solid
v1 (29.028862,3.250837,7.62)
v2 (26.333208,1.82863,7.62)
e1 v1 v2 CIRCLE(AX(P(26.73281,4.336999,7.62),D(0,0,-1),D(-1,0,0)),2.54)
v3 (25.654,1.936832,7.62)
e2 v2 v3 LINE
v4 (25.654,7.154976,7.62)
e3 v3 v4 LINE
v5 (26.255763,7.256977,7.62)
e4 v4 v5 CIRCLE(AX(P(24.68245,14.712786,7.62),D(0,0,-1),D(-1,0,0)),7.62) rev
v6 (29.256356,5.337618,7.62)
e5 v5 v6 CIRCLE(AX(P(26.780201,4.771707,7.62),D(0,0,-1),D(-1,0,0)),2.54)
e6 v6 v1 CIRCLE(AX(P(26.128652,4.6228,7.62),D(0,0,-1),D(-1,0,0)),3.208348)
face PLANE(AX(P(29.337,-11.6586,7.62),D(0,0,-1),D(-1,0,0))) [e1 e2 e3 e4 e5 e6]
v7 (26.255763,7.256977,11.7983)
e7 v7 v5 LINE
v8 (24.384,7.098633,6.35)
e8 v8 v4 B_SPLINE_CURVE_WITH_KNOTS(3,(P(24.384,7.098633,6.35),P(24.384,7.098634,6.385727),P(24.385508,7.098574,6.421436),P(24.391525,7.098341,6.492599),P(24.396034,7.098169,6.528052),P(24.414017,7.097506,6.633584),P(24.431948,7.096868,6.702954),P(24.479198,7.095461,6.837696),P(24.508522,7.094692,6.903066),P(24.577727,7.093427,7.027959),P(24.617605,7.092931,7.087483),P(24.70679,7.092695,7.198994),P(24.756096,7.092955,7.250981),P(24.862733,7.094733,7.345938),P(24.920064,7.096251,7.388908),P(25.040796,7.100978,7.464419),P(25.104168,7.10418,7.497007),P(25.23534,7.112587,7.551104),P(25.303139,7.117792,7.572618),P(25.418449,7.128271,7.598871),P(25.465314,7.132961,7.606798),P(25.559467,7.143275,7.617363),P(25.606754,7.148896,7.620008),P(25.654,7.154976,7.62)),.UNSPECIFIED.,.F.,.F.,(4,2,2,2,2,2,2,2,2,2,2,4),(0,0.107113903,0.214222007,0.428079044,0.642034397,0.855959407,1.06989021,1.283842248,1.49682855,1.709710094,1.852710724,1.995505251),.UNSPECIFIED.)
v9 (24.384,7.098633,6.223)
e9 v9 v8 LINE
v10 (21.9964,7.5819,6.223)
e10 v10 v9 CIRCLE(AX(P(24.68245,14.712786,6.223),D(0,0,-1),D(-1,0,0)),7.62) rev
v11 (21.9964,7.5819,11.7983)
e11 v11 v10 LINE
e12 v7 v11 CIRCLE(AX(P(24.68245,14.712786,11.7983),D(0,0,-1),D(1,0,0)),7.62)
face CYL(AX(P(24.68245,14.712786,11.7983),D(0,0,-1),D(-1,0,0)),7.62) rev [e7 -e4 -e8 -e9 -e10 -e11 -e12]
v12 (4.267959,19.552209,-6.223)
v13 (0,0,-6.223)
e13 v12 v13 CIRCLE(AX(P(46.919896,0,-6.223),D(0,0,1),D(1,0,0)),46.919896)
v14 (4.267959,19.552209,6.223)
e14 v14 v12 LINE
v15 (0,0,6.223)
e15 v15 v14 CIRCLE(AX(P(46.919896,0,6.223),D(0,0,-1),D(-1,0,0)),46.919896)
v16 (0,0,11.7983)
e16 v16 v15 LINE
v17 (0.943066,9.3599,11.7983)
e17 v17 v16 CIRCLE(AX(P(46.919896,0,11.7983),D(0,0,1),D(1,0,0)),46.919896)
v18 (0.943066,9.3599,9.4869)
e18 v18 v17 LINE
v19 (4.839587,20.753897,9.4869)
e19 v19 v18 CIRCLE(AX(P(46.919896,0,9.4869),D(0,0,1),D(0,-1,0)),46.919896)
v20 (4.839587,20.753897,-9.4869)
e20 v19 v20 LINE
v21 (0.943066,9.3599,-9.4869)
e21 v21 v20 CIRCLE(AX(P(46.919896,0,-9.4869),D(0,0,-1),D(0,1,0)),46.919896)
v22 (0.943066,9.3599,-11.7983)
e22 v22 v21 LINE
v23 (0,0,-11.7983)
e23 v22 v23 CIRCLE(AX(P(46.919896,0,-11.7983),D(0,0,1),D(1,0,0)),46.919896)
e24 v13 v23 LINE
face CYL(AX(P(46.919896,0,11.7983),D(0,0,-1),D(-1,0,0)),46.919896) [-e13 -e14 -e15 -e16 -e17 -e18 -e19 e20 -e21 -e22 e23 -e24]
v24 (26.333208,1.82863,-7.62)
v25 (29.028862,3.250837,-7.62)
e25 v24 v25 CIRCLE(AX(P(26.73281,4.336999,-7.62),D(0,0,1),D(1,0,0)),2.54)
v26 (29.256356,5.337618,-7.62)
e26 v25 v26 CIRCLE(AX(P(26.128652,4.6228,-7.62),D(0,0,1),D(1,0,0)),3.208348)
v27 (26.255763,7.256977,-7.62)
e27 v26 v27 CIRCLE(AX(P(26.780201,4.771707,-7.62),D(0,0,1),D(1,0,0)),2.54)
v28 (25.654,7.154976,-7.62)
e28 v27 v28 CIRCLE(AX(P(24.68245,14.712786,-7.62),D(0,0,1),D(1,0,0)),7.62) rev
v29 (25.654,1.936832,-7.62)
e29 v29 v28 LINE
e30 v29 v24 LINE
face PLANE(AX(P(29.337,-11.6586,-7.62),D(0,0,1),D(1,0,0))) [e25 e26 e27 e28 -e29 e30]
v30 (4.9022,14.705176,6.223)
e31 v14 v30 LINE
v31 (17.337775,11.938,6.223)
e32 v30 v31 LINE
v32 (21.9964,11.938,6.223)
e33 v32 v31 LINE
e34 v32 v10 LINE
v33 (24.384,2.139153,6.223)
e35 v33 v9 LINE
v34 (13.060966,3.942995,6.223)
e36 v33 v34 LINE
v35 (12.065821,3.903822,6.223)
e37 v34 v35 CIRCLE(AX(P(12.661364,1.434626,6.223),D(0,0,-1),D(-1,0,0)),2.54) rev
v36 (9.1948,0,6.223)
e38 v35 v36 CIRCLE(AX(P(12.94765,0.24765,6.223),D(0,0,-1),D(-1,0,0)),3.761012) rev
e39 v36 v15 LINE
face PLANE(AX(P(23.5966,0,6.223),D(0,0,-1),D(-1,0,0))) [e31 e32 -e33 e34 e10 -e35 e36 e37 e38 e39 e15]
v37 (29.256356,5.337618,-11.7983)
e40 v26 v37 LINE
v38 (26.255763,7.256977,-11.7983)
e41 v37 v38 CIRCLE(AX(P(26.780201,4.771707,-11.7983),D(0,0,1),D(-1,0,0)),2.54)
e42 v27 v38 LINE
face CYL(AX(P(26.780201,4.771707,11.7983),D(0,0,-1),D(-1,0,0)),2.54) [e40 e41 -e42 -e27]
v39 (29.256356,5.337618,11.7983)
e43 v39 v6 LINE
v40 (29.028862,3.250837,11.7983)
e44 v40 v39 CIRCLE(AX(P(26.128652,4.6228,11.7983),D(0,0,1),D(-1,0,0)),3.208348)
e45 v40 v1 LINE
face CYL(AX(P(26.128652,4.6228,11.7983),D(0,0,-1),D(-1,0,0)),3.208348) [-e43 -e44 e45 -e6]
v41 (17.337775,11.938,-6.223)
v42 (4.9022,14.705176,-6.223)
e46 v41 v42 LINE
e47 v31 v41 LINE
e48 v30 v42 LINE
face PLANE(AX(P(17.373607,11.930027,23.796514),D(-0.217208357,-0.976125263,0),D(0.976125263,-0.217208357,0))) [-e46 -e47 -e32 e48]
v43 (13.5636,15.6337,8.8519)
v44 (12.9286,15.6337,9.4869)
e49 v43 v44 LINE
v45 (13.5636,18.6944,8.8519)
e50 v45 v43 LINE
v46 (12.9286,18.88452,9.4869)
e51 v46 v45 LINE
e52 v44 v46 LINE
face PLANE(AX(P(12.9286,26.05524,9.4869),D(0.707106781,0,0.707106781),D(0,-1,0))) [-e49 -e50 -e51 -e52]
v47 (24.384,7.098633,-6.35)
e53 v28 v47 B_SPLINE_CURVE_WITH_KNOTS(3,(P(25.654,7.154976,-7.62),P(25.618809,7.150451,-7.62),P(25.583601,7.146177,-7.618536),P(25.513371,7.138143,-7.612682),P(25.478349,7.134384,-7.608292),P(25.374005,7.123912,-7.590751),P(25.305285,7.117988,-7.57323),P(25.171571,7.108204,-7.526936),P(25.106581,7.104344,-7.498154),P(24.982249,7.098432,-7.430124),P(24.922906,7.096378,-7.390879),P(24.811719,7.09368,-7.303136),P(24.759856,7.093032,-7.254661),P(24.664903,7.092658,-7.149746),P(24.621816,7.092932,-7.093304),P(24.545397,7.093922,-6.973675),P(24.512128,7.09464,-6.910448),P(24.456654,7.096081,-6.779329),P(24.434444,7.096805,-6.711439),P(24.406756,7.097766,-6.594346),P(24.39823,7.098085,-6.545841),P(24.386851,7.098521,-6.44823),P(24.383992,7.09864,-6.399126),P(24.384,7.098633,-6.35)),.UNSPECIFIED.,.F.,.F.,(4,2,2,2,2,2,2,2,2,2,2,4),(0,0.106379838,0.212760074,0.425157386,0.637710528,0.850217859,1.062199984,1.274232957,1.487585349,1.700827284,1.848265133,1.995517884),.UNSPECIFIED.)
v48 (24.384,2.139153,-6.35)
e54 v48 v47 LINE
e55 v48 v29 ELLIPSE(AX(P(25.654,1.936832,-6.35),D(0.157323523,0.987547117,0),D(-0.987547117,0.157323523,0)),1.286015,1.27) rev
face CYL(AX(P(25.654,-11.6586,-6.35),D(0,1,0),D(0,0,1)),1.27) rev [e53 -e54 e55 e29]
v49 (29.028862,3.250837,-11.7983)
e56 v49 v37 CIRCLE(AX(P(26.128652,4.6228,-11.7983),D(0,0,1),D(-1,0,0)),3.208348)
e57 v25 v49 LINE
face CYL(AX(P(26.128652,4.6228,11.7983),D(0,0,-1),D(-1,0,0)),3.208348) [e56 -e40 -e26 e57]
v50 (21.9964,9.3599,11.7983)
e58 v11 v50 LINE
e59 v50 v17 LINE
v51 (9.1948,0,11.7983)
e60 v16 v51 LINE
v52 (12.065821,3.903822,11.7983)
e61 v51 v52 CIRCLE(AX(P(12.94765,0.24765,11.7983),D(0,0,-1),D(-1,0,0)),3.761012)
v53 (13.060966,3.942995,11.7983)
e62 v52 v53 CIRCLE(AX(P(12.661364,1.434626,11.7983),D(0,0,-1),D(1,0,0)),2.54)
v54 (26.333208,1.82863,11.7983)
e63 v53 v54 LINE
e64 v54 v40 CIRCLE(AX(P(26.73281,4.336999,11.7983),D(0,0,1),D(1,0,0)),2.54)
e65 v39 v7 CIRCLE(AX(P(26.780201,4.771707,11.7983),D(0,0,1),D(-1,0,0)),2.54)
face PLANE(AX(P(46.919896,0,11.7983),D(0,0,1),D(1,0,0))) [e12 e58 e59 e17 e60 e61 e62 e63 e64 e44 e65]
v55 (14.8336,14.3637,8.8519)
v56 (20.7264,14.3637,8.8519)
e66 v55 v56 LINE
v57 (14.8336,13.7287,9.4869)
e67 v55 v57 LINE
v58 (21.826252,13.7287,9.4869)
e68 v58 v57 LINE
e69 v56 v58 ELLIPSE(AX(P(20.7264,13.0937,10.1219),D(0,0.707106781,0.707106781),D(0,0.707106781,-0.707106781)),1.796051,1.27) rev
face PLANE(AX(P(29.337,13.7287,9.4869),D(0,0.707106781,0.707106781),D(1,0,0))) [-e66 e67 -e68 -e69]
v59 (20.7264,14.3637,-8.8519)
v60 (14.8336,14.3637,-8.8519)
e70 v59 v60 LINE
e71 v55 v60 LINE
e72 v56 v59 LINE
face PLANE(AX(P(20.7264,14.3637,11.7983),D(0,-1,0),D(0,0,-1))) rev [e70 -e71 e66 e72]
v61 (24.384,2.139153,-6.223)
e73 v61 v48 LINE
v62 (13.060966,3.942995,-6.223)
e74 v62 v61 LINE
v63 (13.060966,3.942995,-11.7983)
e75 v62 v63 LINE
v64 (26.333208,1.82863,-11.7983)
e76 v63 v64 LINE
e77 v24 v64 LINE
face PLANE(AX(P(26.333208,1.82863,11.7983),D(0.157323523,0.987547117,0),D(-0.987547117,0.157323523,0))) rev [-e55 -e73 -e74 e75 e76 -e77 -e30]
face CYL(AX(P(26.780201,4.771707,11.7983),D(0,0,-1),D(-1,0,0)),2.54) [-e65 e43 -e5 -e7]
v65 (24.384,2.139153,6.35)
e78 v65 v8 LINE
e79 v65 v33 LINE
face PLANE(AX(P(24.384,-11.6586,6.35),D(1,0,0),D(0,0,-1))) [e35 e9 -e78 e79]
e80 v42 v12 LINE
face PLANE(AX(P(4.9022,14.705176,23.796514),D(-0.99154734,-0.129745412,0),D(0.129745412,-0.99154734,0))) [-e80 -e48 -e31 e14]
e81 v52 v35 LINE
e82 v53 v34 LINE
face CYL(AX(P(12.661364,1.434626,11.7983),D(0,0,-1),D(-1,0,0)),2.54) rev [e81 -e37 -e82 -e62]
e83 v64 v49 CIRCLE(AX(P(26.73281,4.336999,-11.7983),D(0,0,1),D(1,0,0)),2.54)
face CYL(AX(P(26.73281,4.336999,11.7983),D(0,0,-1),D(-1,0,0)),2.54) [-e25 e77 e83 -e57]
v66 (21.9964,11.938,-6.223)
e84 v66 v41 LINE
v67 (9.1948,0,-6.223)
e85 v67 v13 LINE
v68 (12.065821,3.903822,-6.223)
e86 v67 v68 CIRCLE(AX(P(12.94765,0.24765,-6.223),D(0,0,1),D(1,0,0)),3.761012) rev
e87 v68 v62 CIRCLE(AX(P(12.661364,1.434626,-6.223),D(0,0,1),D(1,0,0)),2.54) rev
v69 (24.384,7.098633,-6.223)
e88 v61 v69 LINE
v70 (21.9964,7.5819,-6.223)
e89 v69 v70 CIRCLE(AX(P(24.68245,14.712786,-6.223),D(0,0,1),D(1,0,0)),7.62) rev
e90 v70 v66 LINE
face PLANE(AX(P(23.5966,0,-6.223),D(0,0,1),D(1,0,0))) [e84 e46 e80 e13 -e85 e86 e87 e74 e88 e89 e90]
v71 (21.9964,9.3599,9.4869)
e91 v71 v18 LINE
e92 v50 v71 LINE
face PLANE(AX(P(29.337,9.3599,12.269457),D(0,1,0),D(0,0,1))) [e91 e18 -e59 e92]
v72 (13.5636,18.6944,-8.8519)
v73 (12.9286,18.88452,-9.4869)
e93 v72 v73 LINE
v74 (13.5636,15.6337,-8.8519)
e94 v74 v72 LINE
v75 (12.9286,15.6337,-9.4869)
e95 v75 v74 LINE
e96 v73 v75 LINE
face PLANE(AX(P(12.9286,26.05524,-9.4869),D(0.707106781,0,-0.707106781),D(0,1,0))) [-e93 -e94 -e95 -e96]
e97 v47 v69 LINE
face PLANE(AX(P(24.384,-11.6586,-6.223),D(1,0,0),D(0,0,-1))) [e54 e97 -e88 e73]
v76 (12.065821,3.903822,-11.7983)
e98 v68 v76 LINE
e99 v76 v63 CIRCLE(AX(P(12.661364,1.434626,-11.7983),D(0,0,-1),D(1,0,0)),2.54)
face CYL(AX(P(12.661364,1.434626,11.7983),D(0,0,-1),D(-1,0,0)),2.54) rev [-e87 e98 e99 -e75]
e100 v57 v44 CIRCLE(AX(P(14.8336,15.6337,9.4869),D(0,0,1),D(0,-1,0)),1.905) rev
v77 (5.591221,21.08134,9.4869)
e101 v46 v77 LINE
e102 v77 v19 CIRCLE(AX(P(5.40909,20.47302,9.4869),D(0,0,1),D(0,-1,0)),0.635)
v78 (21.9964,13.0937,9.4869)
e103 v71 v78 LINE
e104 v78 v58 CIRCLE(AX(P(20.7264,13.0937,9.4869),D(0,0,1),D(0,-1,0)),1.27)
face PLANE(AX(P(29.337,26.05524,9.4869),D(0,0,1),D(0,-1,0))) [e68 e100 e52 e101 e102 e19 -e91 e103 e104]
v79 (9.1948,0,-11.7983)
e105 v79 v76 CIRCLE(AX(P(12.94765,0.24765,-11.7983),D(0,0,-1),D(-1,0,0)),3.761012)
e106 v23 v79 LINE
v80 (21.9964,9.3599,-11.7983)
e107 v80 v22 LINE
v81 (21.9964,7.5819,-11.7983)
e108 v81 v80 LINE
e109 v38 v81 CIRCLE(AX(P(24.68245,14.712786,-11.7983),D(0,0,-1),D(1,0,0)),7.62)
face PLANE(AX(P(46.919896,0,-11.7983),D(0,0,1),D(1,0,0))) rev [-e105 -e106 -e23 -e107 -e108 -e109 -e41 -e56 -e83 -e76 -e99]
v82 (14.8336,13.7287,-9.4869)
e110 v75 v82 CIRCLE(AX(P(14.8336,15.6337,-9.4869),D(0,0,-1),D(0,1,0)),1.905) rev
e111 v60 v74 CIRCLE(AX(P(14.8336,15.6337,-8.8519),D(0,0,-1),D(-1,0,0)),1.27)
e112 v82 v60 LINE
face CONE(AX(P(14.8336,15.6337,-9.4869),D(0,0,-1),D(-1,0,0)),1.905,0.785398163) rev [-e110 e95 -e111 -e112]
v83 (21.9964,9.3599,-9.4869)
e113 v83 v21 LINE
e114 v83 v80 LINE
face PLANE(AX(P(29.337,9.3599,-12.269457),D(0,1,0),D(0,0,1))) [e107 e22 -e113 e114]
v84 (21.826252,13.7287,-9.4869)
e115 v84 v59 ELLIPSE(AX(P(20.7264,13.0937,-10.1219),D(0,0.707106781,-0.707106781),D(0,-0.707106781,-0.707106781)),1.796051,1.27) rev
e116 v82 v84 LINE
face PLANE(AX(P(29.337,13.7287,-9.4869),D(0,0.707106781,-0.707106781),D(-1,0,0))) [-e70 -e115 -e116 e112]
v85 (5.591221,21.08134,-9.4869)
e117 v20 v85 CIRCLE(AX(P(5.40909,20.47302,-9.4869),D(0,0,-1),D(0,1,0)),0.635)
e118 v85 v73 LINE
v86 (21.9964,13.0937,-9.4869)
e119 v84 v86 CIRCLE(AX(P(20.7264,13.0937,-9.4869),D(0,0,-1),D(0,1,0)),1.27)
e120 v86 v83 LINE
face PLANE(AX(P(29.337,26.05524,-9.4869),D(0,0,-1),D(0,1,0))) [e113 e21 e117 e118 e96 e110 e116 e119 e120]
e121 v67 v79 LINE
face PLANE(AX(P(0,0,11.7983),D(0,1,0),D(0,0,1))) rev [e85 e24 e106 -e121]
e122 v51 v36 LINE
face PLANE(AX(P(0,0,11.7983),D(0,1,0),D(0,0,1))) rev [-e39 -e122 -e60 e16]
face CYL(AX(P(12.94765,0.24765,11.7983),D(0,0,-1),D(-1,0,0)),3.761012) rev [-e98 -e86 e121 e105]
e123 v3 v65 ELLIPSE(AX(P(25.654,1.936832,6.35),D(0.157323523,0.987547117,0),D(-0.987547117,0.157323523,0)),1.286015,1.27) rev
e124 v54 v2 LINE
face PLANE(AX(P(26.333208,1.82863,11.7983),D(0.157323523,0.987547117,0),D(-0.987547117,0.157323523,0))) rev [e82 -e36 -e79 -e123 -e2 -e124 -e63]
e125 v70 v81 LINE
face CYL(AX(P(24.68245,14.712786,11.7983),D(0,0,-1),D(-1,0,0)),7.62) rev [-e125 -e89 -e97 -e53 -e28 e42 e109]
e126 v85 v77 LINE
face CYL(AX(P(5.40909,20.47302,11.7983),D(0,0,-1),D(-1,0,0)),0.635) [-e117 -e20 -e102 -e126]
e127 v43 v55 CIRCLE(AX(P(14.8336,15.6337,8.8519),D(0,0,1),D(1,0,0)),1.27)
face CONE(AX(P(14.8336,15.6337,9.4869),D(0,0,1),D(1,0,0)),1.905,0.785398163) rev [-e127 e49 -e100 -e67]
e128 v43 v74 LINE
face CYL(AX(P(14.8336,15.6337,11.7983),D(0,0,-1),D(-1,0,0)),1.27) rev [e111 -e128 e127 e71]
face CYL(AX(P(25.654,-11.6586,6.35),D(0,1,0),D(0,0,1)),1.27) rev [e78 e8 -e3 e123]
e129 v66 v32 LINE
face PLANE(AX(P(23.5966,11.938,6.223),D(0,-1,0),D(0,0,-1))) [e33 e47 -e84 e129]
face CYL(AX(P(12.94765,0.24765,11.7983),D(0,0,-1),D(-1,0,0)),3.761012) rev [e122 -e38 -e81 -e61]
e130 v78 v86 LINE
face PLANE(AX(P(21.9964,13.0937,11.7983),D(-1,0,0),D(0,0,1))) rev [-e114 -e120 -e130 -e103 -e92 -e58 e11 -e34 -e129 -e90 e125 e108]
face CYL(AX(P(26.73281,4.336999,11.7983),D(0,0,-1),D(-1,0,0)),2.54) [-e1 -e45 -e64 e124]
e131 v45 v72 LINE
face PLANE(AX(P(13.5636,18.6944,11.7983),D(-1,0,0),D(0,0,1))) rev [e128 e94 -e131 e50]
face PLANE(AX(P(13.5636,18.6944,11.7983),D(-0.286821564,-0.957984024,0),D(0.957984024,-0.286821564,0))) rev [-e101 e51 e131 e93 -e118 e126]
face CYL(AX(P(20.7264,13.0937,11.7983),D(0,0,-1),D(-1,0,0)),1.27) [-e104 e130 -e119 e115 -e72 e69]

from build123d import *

# Parameters (mm, degrees)
BOSS_EXTRUDE1_DEPTH = 11.7983
SKETCH2_W           = 2.782556626
SKETCH2_H           = 16.695339754
CUT_EXTRUDE1_DEPTH  = 39.088832947
CHAMFER5_SIZE       = 0.635
FILLET1_R           = 0.635
SKETCH3_W           = 12.446
SKETCH3_H           = 11.938
CUT_EXTRUDE2_DEPTH  = 23.5966
CUT_EXTRUDE3_DEPTH  = 23.5966
CUT_EXTRUDE4_DEPTH  = 12.446


with BuildPart() as part:
    # Sketch1 → Boss-Extrude1 (new, symmetric)
    with BuildSketch(Plane.XY):
        with BuildLine():
            Line((0, 0), (9.1948, 0))
            ThreePointArc((9.1948, 0), (9.917795425, 2.47592173), (12.065820738, 3.903821604))
            ThreePointArc((12.065820738, 3.903821604), (12.561454562, 3.97266008), (13.060965958, 3.942995467))
            Line((13.060965958, 3.942995467), (26.333208305, 1.828629586))
            ThreePointArc((26.333208305, 1.828629586), (27.918052264, 2.09049066), (29.028861508, 3.25083734))
            ThreePointArc((29.028861508, 3.25083734), (29.318103156, 4.275095808), (29.256355961, 5.337618007))
            ThreePointArc((29.256355961, 5.337618007), (28.148880761, 6.911407154), (26.255762963, 7.25697712))
            ThreePointArc((26.255762963, 7.25697712), (24.102846991, 7.114861278), (21.9964, 7.5819))
            Line((21.9964, 7.5819), (21.9964, 13.0937))
            ThreePointArc((21.9964, 13.0937), (21.624425612, 13.991725612), (20.7264, 14.3637))
            Line((20.7264, 14.3637), (14.8336, 14.3637))
            ThreePointArc((14.8336, 14.3637), (13.935574388, 14.735674388), (13.5636, 15.6337))
            Line((13.5636, 15.6337), (13.5636, 18.6944))
            Line((13.5636, 18.6944), (5.08, 21.2344))
            ThreePointArc((5.08, 21.2344), (1.287669396, 10.916800623), (0, 0))
        make_face()
    extrude(amount=BOSS_EXTRUDE1_DEPTH, both=True)

    # Sketch2 → Cut-Extrude1 (cut, through all)
    with BuildSketch(Plane(origin=(0, 0, 0), x_dir=(0, 0, -1), z_dir=(1, 0, 0))):
        with Locations((-10.878178313, 17.707569877)):
            Rectangle(SKETCH2_W, SKETCH2_H)
        with Locations((10.878178313, 17.707569877)):
            Rectangle(SKETCH2_W, SKETCH2_H)
    extrude(amount=CUT_EXTRUDE1_DEPTH, mode=Mode.SUBTRACT)

    # Chamfer5
    # the kernel refuses this chamfer: 0.635 mm, written as the material it takes off along each edge
    with BuildSketch(Plane(origin=(22.359418697, 14.3637, 9.4869), x_dir=(0, -0.9996219169112966, 0.02749587661058734), z_dir=(-1, 0, 0))) as chamfer5_piece_1:
        Polygon((CHAMFER5_SIZE * 0.999621916911, -CHAMFER5_SIZE * 0.0274958766106), (-CHAMFER5_SIZE * 0.0274958766106, -CHAMFER5_SIZE * 0.999621916911), (0, 0), align=None)
    extrude(amount=7.525818697, mode=Mode.SUBTRACT)
    with BuildSketch(Plane(origin=(14.8336, 15.6337, 9.4869), x_dir=(-1, 0, 0), z_dir=(0, 1, 0))) as chamfer5_piece_2:
        Polygon((1.27 + CHAMFER5_SIZE, 0), (1.27, -CHAMFER5_SIZE), (1.27, 0), align=None)
    revolve(axis=Axis((14.8336, 15.6337, 9.4869), (0, 0, 1)), revolution_arc=90, mode=Mode.SUBTRACT)
    with BuildSketch(Plane(origin=(13.5636, 15.6337, 9.4869), x_dir=(-0.9996219169112968, 0, 0.02749587661058727), z_dir=(0, 1, 0))) as chamfer5_piece_3:
        Polygon((CHAMFER5_SIZE * 0.999621916911, -CHAMFER5_SIZE * 0.0274958766106), (-CHAMFER5_SIZE * 0.0274958766106, -CHAMFER5_SIZE * 0.999621916911), (0, 0), align=None)
    extrude(amount=4.693718697, mode=Mode.SUBTRACT)
    with BuildSketch(Plane(origin=(13.5636, 15.6337, -9.4869), x_dir=(-0.9996219169112968, 0, -0.02749587661058727), z_dir=(0, 1, 0))) as chamfer5_piece_4:
        Polygon((CHAMFER5_SIZE * 0.999621916911, CHAMFER5_SIZE * 0.0274958766106), (-CHAMFER5_SIZE * 0.0274958766106, CHAMFER5_SIZE * 0.999621916911), (0, 0), align=None)
    extrude(amount=4.693718697, mode=Mode.SUBTRACT)
    with BuildSketch(Plane(origin=(14.8336, 15.6337, -9.4869), x_dir=(-1, 0, 0), z_dir=(0, 1, 0))) as chamfer5_piece_5:
        Polygon((1.27 + CHAMFER5_SIZE, 0), (1.27, CHAMFER5_SIZE), (1.27, 0), align=None)
    revolve(axis=Axis((14.8336, 15.6337, -9.4869), (0, 0, 1)), revolution_arc=90, mode=Mode.SUBTRACT)
    with BuildSketch(Plane(origin=(22.359418697, 14.3637, -9.4869), x_dir=(0, -0.9996219169112968, -0.027495876610587194), z_dir=(-1, 0, 0))) as chamfer5_piece_6:
        Polygon((CHAMFER5_SIZE * 0.999621916911, CHAMFER5_SIZE * 0.0274958766106), (-CHAMFER5_SIZE * 0.0274958766106, CHAMFER5_SIZE * 0.999621916911), (0, 0), align=None)
    extrude(amount=7.525818697, mode=Mode.SUBTRACT)

    # Fillet1
    fillet1_edges = [part.edges().sort_by_distance(p)[0] for p in [
        (5.08, 21.2344, 0),
    ]]
    fillet(fillet1_edges, radius=FILLET1_R)

    # Sketch3 → Cut-Extrude2 (cut)
    with BuildSketch(Plane(origin=(0, 0, 0), x_dir=(0, 0, -1), z_dir=(1, 0, 0))):
        with Locations((0, 5.969)):
            Rectangle(SKETCH3_W, SKETCH3_H)
    extrude(amount=CUT_EXTRUDE2_DEPTH, mode=Mode.SUBTRACT)

    # Sketch4 → Cut-Extrude3 (cut)
    with BuildSketch(Plane(origin=(0, 11.938, 0), x_dir=(-1, 0, 0), z_dir=(0, -1, 0))):
        with BuildLine():
            Line((-18.943995478, -6.223), (-24.384, -6.223))
            Line((-24.384, -6.223), (-24.384, -6.35))
            ThreePointArc((-24.384, -6.35), (-24.755974388, -7.248025612), (-25.654, -7.62))
            Line((-25.654, -7.62), (-29.337, -7.62))
            Line((-29.337, -7.62), (-29.337, 7.62))
            Line((-29.337, 7.62), (-25.654, 7.62))
            ThreePointArc((-25.654, 7.62), (-24.755974388, 7.248025612), (-24.384, 6.35))
            Line((-24.384, 6.35), (-24.384, 6.223))
            Line((-24.384, 6.223), (-18.943995478, 6.223))
            Line((-18.943995478, 6.223), (-18.943995478, -6.223))
        make_face()
    extrude(amount=CUT_EXTRUDE3_DEPTH, mode=Mode.SUBTRACT)

    # Sketch5 → Cut-Extrude4 (cut)
    with BuildSketch(Plane.XY.offset(-6.223)):
        Polygon((17.373606876, 11.930026708), (4.9022, 14.705176479), (4.267958712, 19.552209242), (1.539127618, 19.552209242), (1.539127618, 11.930026708), align=None)
    extrude(amount=CUT_EXTRUDE4_DEPTH, mode=Mode.SUBTRACT)


solid = part.part
